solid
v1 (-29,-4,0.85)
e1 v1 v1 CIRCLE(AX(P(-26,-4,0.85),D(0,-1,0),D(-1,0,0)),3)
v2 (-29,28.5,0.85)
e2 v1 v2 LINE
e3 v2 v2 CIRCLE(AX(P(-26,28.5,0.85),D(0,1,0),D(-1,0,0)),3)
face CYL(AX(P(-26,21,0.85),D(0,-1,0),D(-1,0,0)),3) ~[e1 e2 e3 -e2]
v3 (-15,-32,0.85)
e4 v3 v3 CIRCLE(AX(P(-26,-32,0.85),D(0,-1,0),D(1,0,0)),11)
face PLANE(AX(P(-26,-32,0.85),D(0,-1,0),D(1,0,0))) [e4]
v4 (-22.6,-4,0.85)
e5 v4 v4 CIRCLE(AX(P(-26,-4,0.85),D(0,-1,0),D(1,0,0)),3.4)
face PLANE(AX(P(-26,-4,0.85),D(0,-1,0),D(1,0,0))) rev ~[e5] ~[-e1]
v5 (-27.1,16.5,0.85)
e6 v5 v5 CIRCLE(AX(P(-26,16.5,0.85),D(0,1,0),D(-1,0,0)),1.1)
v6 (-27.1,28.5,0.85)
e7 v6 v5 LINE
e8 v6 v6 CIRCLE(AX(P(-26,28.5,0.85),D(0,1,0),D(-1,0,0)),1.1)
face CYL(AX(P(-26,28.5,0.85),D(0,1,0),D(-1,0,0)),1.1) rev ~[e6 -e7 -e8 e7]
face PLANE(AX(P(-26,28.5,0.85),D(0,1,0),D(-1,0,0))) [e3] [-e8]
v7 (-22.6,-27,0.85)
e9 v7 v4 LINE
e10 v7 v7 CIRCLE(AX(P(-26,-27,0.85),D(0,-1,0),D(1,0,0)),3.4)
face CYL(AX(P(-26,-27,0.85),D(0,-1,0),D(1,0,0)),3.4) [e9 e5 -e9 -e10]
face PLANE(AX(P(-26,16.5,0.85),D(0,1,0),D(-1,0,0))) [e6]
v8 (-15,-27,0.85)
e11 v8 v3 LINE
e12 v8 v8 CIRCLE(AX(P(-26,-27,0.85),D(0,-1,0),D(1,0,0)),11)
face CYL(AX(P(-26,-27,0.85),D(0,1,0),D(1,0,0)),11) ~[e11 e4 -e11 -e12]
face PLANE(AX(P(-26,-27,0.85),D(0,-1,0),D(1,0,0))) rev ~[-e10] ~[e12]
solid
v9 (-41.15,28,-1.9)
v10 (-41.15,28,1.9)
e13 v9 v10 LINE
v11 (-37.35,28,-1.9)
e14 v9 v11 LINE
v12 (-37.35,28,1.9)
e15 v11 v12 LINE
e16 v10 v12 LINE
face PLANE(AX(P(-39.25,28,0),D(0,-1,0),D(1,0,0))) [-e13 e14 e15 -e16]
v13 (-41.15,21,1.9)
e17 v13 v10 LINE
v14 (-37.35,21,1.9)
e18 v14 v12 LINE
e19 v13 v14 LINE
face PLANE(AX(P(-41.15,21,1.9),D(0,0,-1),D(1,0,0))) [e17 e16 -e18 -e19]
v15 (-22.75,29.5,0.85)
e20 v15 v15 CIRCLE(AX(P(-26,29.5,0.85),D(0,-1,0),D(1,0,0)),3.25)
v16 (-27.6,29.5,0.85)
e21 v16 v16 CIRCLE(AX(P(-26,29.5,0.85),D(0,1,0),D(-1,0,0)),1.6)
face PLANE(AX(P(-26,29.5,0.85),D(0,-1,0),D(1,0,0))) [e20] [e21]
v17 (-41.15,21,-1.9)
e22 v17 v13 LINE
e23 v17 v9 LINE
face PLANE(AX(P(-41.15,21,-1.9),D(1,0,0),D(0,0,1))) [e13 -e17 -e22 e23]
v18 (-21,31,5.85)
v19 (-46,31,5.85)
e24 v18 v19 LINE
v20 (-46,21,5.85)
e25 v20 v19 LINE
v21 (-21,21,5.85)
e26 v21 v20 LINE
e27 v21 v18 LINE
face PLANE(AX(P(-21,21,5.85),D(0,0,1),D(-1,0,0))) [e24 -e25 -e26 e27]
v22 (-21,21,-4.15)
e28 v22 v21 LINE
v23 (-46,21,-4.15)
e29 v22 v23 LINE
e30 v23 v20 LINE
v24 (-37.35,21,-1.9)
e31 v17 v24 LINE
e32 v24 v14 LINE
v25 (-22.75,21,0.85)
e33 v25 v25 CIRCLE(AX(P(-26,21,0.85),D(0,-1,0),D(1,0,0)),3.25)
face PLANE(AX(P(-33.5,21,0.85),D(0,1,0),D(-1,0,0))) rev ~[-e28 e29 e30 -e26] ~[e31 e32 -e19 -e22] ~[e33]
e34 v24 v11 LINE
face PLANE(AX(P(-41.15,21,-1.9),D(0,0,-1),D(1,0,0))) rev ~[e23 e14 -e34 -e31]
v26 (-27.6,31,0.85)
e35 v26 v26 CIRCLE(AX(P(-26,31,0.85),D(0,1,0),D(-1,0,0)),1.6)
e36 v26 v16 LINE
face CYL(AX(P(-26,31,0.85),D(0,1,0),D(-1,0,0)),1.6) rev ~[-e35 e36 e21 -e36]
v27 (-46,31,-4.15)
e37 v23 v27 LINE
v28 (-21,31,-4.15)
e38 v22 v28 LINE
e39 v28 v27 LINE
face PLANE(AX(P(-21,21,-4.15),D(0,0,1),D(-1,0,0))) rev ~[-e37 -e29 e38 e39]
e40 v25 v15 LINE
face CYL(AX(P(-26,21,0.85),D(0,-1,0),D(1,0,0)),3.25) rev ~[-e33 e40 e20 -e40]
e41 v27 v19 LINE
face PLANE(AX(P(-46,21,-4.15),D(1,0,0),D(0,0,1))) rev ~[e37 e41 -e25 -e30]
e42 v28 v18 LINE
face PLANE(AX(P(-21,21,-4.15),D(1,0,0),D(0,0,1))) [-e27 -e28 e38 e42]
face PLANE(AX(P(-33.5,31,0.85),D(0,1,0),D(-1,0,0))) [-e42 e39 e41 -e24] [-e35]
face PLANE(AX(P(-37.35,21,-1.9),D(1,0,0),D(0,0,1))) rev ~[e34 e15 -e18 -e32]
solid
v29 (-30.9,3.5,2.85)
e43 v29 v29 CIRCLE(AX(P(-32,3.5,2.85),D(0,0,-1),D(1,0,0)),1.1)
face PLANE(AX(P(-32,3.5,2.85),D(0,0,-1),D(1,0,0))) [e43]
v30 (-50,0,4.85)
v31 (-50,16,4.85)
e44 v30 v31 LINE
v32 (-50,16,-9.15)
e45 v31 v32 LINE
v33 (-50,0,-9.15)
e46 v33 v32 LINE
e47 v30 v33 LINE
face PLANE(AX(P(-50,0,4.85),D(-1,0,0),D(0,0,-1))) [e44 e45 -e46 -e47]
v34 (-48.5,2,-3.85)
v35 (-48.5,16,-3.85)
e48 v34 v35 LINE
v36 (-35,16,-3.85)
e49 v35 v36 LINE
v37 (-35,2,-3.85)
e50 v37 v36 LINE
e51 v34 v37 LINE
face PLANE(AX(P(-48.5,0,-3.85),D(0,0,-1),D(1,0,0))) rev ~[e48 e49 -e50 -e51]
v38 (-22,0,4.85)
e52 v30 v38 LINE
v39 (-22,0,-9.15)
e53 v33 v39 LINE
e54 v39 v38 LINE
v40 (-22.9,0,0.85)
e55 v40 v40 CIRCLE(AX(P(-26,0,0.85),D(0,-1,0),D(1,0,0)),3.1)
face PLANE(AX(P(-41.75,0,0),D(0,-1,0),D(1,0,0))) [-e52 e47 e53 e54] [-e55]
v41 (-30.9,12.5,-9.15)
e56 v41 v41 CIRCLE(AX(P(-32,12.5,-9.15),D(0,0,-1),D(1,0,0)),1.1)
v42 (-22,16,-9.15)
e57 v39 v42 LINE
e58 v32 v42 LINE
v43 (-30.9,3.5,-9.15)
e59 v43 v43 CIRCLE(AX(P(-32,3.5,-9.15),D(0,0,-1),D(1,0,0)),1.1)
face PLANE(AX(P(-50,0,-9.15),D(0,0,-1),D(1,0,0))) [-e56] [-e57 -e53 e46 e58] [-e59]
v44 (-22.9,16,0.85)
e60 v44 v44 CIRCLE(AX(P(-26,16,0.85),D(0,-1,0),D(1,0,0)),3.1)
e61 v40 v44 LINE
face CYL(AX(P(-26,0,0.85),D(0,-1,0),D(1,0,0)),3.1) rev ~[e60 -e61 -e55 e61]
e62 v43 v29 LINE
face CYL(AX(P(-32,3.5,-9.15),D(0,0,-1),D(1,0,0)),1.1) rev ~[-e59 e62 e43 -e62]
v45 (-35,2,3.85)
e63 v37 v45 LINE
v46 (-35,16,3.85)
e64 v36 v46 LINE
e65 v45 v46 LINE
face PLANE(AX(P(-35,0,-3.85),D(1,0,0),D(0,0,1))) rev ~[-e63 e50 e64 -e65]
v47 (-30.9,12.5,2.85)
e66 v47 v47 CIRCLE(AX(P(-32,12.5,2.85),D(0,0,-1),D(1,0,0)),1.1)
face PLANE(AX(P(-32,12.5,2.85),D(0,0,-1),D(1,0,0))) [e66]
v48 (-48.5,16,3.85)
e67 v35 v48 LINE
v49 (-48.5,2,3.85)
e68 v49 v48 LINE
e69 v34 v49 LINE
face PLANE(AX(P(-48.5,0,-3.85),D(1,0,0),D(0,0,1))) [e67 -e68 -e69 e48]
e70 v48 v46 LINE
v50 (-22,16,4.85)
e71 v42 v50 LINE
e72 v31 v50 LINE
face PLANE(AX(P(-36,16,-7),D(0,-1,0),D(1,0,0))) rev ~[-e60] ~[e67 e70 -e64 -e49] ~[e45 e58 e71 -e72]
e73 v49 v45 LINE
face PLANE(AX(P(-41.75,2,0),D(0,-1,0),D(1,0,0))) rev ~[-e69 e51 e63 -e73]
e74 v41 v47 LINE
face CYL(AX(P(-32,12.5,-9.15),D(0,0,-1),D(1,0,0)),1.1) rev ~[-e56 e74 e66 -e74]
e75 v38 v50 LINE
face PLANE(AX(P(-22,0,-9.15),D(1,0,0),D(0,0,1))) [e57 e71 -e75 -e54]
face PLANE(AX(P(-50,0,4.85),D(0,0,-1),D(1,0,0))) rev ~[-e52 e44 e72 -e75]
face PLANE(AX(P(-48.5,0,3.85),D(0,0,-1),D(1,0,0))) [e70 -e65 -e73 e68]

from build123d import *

# Parameters (mm, degrees)
F0_W      = 28
F0_H      = 4.3
F0_H_2    = 9.7
F0_W_2    = 13.5
F0_H_3    = 7.7
F0_R      = 3.1
F1_DEPTH  = 16
F2_W      = 13.5
F2_H      = 7.7
F3_DEPTH  = 2
F4_R      = 1.1
F5_DEPTH  = 12
F8_R      = 11
F9_DEPTH  = 5
F10_R     = 3
F11_DEPTH = 48
F12_W     = 25
F12_H     = 10
F13_DEPTH = 10
F14_W     = 3.8
F14_H     = 3.8
F15_DEPTH = 7
F14_R     = 3.25
F16_DEPTH = 8.5
F17_R     = 3.4
F18_DEPTH = 23
F19_R     = 3
F20_DEPTH = 7.5
F21_R     = 1.1
F22_DEPTH = 12
F23_R     = 1.6
F24_DEPTH = 25


with BuildPart() as f1:
    # F0 (on Front) → F1 (new body)
    with BuildSketch(Plane.XZ):
        with Locations((-36, -7)):
            Rectangle(F0_W, F0_H)
        with Locations((-36, 0)):
            Rectangle(F0_W, F0_H_2)
        with Locations((-41.75, 0)):
            Rectangle(F0_W_2, F0_H_3, mode=Mode.SUBTRACT)
        with Locations((-26, 0.85)):
            Circle(F0_R, mode=Mode.SUBTRACT)
    extrude(amount=-F1_DEPTH)

    # F2 (on face) → F3 (join)
    with BuildSketch(Plane.XZ):
        with Locations((-41.75, 0)):
            Rectangle(F2_W, F2_H)
    extrude(amount=-F3_DEPTH)

    # F4 (on face) → F5 (cut)
    with BuildSketch(Plane(origin=(0, 0, -9.15), x_dir=(1, 0, 0), z_dir=(0, 0, -1))):
        with Locations((-32, -3.5)):
            Circle(F4_R)
        with Locations((-32, -12.5)):
            Circle(F4_R)
    extrude(amount=-F5_DEPTH, mode=Mode.SUBTRACT)


with BuildPart() as f9:
    # F8 (on offset) → F9 (new body)
    with BuildSketch(Plane.XZ.offset(27)):
        with Locations((-26, 0.85)):
            Circle(F8_R)
    extrude(amount=F9_DEPTH)

    # F10 (on face) → F11 (join)
    with BuildSketch(Plane(origin=(0, -27, 0), x_dir=(-1, 0, 0), z_dir=(0, 1, 0))):
        with Locations((26, 0.85)):
            Circle(F10_R)
    extrude(amount=F11_DEPTH)

    # F17 (on face) → F18 (join)
    with BuildSketch(Plane.XZ.offset(27)):
        with Locations((-26, 0.85)):
            Circle(F17_R)
    extrude(amount=-F18_DEPTH)

    # F19 (on face) → F20 (join)
    with BuildSketch(Plane(origin=(0, 21, 0), x_dir=(-1, 0, 0), z_dir=(0, 1, 0))):
        with Locations((26, 0.85)):
            Circle(F19_R)
    extrude(amount=F20_DEPTH)

    # F21 (on face) → F22 (cut)
    with BuildSketch(Plane(origin=(0, 28.5, 0), x_dir=(-1, 0, 0), z_dir=(0, 1, 0))):
        with Locations((26, 0.85)):
            Circle(F21_R)
    extrude(amount=-F22_DEPTH, mode=Mode.SUBTRACT)


with BuildPart() as f13:
    # F12 (on offset) → F13 (new body)
    with BuildSketch(Plane(origin=(0, 21, 0), x_dir=(-1, 0, 0), z_dir=(0, 1, 0))):
        with Locations((33.5, 0.85)):
            Rectangle(F12_W, F12_H)
    extrude(amount=F13_DEPTH)

    # F14 (on face) → F15 (cut)
    with BuildSketch(Plane.XZ.offset(-21)):
        with Locations((-39.25, 0)):
            Rectangle(F14_W, F14_H)
    extrude(amount=-F15_DEPTH, mode=Mode.SUBTRACT)

    # F14 (on face) → F16 (cut)
    with BuildSketch(Plane.XZ.offset(-21)):
        with Locations((-26, 0.85)):
            Circle(F14_R)
    extrude(amount=-F16_DEPTH, mode=Mode.SUBTRACT)

    # F23 (on face) → F24 (cut)
    with BuildSketch(Plane(origin=(0, 31, 0), x_dir=(-1, 0, 0), z_dir=(0, 1, 0))):
        with Locations((26, 0.85)):
            Circle(F23_R)
    extrude(amount=-F24_DEPTH, mode=Mode.SUBTRACT)


solid = Compound([f1.part, f9.part, f13.part])
